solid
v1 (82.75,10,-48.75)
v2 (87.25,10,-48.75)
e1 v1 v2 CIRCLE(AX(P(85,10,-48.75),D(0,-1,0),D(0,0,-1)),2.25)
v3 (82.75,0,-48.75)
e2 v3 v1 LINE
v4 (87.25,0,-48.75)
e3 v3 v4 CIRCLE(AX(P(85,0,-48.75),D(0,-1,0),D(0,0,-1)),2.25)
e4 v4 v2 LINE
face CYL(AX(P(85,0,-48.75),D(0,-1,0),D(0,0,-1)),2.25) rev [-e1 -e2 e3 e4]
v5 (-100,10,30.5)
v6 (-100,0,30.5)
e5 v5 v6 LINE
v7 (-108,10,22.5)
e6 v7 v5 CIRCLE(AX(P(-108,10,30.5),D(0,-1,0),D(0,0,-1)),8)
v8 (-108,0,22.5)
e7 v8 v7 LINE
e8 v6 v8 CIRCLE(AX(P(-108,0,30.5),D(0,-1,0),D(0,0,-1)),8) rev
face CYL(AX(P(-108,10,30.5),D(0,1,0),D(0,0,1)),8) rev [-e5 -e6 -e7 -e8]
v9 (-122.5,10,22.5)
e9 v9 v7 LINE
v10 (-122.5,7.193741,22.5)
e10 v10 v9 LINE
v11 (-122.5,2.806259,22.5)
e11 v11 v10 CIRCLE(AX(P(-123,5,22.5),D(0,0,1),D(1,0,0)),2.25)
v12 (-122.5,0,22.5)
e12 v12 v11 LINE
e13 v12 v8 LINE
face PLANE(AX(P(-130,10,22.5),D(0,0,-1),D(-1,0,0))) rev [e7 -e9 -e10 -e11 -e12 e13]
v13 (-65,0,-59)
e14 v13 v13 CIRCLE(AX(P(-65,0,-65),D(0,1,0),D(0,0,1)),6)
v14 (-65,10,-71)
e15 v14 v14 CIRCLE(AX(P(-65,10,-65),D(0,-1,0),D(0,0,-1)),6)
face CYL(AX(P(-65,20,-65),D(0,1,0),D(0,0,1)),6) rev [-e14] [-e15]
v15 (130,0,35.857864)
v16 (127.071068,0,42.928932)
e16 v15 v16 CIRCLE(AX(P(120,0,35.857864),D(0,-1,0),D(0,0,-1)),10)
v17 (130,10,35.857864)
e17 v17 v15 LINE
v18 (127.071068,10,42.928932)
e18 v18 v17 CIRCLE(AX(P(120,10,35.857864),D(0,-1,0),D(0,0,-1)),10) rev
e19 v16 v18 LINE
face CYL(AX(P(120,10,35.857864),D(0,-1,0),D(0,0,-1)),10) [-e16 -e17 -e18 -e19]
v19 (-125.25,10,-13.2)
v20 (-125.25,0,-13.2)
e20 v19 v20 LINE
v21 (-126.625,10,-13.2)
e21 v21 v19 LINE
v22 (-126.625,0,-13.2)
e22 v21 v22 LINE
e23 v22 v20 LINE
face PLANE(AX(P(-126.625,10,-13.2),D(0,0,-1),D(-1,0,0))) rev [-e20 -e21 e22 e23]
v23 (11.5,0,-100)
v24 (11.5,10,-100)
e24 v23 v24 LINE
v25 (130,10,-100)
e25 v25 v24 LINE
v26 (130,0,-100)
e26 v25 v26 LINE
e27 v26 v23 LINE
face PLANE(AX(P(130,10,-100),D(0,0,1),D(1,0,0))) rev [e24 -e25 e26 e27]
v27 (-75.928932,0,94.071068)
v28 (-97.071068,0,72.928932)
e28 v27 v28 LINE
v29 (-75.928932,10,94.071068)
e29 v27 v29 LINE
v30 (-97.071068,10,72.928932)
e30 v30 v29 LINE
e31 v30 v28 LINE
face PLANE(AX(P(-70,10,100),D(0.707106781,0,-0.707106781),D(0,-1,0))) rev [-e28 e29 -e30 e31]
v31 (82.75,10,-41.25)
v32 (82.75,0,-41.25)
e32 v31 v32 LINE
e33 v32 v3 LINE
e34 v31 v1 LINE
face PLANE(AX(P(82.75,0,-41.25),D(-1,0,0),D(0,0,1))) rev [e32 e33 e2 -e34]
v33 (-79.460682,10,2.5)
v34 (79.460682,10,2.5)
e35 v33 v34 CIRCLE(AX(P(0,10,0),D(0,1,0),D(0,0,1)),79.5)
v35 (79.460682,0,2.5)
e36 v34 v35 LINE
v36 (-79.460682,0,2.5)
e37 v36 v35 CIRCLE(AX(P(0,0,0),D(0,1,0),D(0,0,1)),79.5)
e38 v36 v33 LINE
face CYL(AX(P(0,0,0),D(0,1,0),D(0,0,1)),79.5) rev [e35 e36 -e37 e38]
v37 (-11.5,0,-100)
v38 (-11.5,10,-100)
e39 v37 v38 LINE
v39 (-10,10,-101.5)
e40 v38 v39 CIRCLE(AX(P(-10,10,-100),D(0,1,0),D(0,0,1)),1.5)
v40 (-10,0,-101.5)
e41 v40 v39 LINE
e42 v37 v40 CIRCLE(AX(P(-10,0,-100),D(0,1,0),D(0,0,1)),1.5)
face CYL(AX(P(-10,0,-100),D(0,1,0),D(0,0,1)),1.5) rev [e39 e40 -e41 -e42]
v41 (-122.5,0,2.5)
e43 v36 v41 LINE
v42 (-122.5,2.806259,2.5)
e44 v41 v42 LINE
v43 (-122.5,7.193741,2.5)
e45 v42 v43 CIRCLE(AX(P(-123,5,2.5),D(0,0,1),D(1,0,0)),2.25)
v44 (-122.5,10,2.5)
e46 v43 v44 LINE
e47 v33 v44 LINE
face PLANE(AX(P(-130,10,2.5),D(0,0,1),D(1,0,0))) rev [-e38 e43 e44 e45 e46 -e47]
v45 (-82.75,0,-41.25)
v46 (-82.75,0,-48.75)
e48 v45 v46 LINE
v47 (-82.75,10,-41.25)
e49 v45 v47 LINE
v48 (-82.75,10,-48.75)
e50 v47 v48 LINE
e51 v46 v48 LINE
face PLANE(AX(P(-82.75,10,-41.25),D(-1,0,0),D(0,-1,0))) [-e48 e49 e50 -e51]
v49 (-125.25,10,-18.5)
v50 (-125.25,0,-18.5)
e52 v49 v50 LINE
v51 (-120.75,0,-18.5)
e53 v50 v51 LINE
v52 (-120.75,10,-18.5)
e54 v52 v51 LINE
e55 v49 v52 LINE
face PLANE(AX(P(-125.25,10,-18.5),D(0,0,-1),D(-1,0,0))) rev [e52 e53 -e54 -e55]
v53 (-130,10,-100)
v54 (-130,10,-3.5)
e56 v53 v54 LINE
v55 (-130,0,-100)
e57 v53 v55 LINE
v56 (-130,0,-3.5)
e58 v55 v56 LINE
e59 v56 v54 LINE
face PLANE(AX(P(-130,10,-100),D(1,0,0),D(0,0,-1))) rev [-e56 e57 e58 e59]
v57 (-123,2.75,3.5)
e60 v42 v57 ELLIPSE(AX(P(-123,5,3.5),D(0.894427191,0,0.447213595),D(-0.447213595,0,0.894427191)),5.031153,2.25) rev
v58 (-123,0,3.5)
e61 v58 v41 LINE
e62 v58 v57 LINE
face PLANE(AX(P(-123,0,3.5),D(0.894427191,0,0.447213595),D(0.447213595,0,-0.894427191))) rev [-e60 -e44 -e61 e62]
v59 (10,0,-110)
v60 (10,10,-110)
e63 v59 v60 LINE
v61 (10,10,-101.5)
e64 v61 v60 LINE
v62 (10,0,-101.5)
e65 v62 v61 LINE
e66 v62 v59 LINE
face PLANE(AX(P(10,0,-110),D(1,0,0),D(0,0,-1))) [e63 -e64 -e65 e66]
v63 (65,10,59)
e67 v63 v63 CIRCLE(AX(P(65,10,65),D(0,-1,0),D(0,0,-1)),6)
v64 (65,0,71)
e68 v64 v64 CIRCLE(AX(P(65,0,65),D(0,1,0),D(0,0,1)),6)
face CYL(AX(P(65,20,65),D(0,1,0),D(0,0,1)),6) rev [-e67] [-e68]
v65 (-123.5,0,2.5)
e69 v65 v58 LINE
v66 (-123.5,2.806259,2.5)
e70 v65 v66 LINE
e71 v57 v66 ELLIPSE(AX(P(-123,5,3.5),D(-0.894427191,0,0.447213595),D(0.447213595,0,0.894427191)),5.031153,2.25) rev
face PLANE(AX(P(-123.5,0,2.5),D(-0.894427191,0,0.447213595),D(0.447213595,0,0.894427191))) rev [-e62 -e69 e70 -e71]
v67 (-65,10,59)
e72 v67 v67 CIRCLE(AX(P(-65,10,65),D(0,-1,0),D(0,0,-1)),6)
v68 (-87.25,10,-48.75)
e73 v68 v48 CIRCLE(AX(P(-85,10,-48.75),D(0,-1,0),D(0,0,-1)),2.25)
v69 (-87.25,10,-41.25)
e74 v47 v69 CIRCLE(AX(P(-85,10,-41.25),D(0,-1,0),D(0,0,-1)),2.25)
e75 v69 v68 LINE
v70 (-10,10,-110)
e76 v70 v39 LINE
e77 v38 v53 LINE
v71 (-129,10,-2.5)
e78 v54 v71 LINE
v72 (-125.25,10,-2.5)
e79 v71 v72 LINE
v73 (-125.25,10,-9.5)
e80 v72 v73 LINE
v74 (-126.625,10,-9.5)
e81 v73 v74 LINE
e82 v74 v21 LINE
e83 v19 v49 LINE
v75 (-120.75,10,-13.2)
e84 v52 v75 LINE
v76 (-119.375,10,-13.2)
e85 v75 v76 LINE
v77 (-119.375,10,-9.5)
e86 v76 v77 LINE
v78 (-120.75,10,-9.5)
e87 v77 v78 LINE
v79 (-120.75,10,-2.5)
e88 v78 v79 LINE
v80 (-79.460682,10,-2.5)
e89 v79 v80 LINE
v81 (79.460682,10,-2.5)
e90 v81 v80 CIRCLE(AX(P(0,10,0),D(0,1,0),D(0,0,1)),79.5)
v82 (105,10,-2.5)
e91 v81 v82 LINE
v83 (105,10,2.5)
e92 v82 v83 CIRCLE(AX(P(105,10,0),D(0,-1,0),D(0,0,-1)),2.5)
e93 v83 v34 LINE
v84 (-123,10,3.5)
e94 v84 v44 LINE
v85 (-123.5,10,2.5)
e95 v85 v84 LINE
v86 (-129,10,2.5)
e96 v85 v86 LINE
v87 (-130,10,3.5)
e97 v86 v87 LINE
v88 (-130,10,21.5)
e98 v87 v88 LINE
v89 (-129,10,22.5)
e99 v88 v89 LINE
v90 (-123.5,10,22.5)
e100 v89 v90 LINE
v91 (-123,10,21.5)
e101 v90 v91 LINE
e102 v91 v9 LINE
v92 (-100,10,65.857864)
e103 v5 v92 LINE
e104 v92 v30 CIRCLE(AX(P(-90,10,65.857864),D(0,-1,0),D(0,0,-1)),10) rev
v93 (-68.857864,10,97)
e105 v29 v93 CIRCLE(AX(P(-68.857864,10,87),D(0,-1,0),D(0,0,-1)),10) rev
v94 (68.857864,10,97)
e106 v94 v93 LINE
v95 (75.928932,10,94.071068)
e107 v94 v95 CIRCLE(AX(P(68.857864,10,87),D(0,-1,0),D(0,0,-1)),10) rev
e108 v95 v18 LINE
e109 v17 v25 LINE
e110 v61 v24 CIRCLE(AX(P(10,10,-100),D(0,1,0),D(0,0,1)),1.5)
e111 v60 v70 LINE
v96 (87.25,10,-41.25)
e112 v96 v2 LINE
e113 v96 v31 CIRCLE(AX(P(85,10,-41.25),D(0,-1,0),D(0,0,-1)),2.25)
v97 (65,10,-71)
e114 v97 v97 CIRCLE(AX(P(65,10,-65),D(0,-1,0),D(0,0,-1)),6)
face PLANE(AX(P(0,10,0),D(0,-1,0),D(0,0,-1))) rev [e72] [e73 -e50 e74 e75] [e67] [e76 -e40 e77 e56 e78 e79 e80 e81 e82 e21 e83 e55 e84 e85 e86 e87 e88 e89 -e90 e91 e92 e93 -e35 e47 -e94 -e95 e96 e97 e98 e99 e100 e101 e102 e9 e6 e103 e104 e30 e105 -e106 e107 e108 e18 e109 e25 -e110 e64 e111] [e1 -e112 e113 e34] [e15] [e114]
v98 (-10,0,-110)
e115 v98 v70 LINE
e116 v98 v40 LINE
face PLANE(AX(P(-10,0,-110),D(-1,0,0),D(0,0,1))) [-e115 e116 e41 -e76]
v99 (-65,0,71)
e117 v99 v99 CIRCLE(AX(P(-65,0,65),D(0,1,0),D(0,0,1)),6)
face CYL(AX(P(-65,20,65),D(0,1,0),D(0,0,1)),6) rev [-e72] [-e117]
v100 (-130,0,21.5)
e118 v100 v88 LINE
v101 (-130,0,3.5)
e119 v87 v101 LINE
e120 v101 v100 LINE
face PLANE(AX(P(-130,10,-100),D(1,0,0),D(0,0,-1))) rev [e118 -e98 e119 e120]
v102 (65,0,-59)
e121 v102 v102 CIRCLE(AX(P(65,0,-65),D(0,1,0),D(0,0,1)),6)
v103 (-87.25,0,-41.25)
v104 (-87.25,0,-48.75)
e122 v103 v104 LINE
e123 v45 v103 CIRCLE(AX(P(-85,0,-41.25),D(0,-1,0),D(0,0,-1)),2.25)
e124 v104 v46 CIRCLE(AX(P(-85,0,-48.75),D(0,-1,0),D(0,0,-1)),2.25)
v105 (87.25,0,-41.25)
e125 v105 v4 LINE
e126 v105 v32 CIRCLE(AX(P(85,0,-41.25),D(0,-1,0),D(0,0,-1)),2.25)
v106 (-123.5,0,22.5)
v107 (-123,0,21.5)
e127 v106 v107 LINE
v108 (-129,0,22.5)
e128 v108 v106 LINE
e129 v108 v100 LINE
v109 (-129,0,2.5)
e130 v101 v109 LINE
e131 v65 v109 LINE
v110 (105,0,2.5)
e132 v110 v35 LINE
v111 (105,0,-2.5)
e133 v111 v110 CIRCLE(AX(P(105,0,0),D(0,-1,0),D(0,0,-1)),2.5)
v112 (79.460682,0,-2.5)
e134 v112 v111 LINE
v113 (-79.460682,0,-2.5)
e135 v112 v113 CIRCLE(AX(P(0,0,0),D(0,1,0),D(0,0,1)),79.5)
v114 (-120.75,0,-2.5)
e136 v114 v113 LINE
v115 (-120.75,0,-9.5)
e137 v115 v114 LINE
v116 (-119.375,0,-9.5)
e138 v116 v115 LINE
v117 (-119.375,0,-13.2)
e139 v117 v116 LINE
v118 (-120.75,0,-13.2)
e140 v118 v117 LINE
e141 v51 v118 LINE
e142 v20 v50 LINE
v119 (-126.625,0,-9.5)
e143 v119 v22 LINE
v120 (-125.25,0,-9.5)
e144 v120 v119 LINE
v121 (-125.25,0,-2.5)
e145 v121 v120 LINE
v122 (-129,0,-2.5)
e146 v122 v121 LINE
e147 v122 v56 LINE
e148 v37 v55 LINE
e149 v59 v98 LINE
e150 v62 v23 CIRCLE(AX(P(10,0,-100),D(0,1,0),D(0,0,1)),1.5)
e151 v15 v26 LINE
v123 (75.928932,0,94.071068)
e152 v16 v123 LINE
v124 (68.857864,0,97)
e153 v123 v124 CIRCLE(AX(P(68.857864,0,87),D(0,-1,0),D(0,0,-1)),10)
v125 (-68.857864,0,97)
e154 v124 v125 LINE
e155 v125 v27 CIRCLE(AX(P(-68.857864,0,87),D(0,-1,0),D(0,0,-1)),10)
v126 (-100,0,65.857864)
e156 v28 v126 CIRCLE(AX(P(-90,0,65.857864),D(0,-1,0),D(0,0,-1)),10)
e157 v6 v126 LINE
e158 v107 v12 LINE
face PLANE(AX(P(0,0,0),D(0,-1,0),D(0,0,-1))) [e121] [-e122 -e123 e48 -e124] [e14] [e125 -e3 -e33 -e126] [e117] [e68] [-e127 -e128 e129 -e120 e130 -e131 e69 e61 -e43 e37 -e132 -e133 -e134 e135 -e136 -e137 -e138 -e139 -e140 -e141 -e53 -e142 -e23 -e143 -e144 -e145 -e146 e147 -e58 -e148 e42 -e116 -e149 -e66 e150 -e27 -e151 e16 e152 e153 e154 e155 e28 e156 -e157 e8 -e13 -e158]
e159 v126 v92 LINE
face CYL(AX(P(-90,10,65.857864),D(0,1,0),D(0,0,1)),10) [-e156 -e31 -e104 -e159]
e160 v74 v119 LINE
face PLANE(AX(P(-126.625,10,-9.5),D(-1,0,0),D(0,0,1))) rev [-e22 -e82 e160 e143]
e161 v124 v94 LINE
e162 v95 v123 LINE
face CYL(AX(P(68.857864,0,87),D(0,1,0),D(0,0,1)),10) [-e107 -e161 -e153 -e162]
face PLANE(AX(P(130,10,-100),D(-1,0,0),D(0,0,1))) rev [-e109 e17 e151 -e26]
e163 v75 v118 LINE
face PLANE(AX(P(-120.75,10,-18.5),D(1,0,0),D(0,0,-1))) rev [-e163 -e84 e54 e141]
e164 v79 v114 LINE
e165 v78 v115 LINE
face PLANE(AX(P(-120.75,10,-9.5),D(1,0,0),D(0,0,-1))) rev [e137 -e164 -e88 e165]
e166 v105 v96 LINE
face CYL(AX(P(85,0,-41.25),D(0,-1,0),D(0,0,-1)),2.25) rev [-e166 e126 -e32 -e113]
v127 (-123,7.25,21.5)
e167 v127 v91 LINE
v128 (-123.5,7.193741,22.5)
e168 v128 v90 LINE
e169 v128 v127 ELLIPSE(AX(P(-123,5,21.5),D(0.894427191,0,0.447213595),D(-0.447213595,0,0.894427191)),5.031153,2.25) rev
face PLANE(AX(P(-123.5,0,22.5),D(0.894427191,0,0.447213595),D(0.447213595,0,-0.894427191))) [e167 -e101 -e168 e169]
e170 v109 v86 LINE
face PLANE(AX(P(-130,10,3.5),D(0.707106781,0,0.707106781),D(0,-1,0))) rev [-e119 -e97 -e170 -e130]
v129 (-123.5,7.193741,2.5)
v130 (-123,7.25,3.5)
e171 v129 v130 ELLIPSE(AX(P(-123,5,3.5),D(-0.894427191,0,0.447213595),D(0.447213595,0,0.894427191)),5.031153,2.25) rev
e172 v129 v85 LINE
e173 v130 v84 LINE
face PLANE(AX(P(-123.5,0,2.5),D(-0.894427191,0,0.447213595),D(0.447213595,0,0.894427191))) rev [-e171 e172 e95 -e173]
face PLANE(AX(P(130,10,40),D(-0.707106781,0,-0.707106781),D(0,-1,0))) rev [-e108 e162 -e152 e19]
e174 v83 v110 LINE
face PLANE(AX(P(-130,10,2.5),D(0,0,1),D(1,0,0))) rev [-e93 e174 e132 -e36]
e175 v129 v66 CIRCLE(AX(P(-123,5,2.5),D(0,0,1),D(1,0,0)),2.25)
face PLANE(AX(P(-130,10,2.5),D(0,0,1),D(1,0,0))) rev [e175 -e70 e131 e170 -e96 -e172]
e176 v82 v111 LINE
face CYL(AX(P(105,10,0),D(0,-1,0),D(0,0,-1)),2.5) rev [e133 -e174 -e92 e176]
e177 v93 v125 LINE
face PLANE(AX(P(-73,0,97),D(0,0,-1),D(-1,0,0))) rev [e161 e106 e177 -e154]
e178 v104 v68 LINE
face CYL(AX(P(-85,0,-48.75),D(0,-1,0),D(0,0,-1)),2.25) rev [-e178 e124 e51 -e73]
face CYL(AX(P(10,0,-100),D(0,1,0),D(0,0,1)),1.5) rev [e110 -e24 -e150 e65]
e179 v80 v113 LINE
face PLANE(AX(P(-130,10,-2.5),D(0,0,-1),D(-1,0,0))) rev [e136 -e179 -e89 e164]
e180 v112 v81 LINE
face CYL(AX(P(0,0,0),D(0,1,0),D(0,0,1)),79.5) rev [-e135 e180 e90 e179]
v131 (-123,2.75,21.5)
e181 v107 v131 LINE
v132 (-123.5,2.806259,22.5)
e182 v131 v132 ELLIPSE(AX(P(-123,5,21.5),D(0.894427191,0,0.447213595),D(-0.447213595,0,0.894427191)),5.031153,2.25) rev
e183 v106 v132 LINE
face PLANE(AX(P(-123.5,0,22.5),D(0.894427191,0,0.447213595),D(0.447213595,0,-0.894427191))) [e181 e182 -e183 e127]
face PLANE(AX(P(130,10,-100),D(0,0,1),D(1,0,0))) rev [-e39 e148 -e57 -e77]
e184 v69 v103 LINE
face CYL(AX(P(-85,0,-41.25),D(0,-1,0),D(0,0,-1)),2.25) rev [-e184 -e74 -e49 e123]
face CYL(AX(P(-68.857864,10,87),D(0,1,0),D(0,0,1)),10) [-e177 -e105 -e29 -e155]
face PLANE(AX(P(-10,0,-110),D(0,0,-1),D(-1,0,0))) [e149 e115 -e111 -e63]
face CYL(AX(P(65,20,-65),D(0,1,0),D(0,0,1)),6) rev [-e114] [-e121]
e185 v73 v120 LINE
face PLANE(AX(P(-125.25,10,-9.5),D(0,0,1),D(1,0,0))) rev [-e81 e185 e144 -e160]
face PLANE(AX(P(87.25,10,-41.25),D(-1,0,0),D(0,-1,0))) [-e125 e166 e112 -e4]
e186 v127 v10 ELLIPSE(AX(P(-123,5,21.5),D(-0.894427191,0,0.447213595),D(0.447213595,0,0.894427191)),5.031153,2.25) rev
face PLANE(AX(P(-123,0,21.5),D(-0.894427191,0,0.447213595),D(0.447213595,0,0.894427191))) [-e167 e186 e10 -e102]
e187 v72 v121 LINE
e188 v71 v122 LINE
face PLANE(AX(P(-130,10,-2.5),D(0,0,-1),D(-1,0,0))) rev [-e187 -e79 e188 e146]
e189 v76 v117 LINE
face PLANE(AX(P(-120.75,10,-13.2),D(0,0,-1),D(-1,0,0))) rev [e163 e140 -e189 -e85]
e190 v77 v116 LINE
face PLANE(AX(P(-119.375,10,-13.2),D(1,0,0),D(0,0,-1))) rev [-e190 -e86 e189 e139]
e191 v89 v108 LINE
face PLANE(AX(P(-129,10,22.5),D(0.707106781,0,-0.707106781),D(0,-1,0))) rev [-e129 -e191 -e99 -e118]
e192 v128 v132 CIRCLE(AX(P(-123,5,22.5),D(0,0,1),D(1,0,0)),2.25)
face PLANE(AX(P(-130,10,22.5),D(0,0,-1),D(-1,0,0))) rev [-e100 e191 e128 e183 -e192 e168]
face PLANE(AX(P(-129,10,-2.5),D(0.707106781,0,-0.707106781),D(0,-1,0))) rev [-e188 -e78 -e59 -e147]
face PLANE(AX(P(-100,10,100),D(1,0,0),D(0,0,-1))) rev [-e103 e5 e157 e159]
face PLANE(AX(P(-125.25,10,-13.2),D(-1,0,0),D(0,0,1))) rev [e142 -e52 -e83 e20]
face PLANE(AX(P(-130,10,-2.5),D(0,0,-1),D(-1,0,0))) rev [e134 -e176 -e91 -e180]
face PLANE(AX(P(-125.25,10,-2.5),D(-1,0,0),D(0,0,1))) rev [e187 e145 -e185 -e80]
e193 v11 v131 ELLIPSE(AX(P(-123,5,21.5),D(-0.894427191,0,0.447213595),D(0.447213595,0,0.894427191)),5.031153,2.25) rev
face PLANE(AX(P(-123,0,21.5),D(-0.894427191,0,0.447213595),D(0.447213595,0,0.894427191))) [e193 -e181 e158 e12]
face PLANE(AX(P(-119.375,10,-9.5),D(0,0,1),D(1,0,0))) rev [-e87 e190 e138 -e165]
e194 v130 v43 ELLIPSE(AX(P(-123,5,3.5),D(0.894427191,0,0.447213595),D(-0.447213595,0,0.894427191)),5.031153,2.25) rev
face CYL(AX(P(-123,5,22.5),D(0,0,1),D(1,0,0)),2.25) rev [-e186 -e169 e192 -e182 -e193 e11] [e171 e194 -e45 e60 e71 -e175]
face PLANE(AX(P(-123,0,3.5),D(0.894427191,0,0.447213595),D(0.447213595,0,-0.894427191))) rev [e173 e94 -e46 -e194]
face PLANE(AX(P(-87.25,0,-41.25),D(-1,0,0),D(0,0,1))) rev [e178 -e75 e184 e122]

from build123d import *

# Parameters (mm, degrees)
SKETCH1_W                  = 260
SKETCH1_H                  = 200
EXTRUDE1_DEPTH             = 10
SKETCH2_R                  = 79.5
EXTRUDE2_DEPTH             = 10
M4_CLEARANCE_HOLE2_DEPTH   = 10
EXTRUDE3_DEPTH             = 10
SKETCH6_W                  = 30
SKETCH6_H                  = 77.5
EXTRUDE4_DEPTH             = 10
FILLET1_R                  = 8
M4_CLEARANCE_HOLE3_D       = 4.5
M4_CLEARANCE_HOLE3_DEPTH   = 20
EXTRUDE5_DEPTH             = 10
F_12_0_12_DIAMETER_HOLE1_D = 12
CHAMFER1_SIZE              = 30
CHAMFER2_SIZE              = 1
CHAMFER3_SIZE              = 60
SKETCH16_W                 = 146
SKETCH16_H                 = 3
EXTRUDE6_DEPTH             = 10
FILLET4_R                  = 10
EXTRUDE7_DEPTH             = 10
SKETCH18_W                 = 20
SKETCH18_H                 = 10
EXTRUDE8_DEPTH             = 10
EXTRUDE9_DEPTH             = 10


# Read off the part's stored shape, not the designer's step: M4 Clearance Hole2
with BuildPart() as part:
    # Sketch1 → Extrude1 (new body)
    with BuildSketch(Plane(origin=(0, 0, 0), x_dir=(1, 0, 0), z_dir=(0, 1, 0))):
        Rectangle(SKETCH1_W, SKETCH1_H)
    extrude(amount=EXTRUDE1_DEPTH)

    # Sketch2 → Extrude2 (cut)
    with BuildSketch(Plane(origin=(0, 10, 0), x_dir=(1, 0, 0), z_dir=(0, 1, 0))):
        with Locations(Location((0, 0, 0), (0, 0, 270))):
            Circle(SKETCH2_R)
    extrude(amount=-EXTRUDE2_DEPTH, mode=Mode.SUBTRACT)

    # M4 Clearance Hole2 outline → M4 Clearance Hole2 (cut)
    with BuildSketch(Plane(origin=(0, 0, 0), x_dir=(1, 0, 0), z_dir=(0, 1, 0))):
        with BuildLine():
            ThreePointArc((-82.75, 48.75), (-85, 51), (-87.25, 48.75))
            Line((-87.25, 48.75), (-87.25, 41.25))
            ThreePointArc((-87.25, 41.25), (-85, 39), (-82.75, 41.25))
            Line((-82.75, 41.25), (-82.75, 48.75))
        make_face()
        with BuildLine():
            ThreePointArc((87.25, 48.75), (85, 51), (82.75, 48.75))
            Line((82.75, 48.75), (82.75, 41.25))
            ThreePointArc((82.75, 41.25), (85, 39), (87.25, 41.25))
            Line((87.25, 41.25), (87.25, 48.75))
        make_face()
    extrude(amount=M4_CLEARANCE_HOLE2_DEPTH, mode=Mode.SUBTRACT)

    # Sketch5 → Extrude3 (cut)
    with BuildSketch(Plane.XZ):
        with BuildLine():
            Line((-130, 2.5), (105, 2.5))
            ThreePointArc((105, 2.5), (107.5, 0), (105, -2.5))
            Line((105, -2.5), (-130, -2.5))
            Line((-130, -2.5), (-130, 2.5))
        make_face()
    extrude(amount=-EXTRUDE3_DEPTH, mode=Mode.SUBTRACT)

    # Sketch6 → Extrude4 (cut)
    with BuildSketch(Plane.XZ):
        with Locations((-115, 61.25)):
            Rectangle(SKETCH6_W, SKETCH6_H)
    extrude(amount=-EXTRUDE4_DEPTH, mode=Mode.SUBTRACT)

    # Fillet1
    fillet1_edges = [part.edges().sort_by_distance(p)[0] for p in [
        (-100, 5, 22.5),
    ]]
    fillet(fillet1_edges, radius=FILLET1_R)

    # M4 Clearance Hole3
    with Locations(Plane.XY.offset(22.5)):
        with Locations((-123, 5)):
            Hole(M4_CLEARANCE_HOLE3_D / 2, depth=M4_CLEARANCE_HOLE3_DEPTH)

    # Sketch11 → Extrude5 (cut)
    with BuildSketch(Plane.XZ):
        Polygon((-125.25, -2.5), (-125.25, -9.5), (-126.625, -9.5), (-126.625, -13.2), (-125.25, -13.2), (-125.25, -18.5), (-120.75, -18.5), (-120.75, -13.2), (-119.375, -13.2), (-119.375, -9.5), (-120.75, -9.5), (-120.75, -2.5), align=None)
    extrude(amount=-EXTRUDE5_DEPTH, mode=Mode.SUBTRACT)

    # Ø12.0 (12) Diameter Hole1 (through all)
    with Locations(Plane(origin=(-130, 20, 100), x_dir=(1, 0, 0), z_dir=(0, 1, 0))):
        with Locations((65, 165), (195, 165), (195, 35), (65, 35)):
            Hole(F_12_0_12_DIAMETER_HOLE1_D / 2)

    # Chamfer1
    chamfer1_edges = [part.edges().sort_by_distance(p)[0] for p in [
        (-100, 5, 100),
    ]]
    chamfer(chamfer1_edges, length=CHAMFER1_SIZE)

    # Chamfer2
    chamfer2_edges = [part.edges().sort_by_distance(p)[0] for p in [
        (-130, 5, 2.5),
        (-130, 5, -2.5),
        (-130, 5, 22.5),
    ]]
    chamfer(chamfer2_edges, length=CHAMFER2_SIZE)

    # Chamfer3
    chamfer3_edges = [part.edges().sort_by_distance(p)[0] for p in [
        (130, 5, 100),
    ]]
    chamfer(chamfer3_edges, length=CHAMFER3_SIZE)

    # Sketch16 → Extrude6 (cut)
    with BuildSketch(Plane(origin=(0, 10, 0), x_dir=(1, 0, 0), z_dir=(0, 1, 0))):
        with Locations((0, -98.5)):
            Rectangle(SKETCH16_W, SKETCH16_H)
    extrude(amount=-EXTRUDE6_DEPTH, mode=Mode.SUBTRACT)

    # Fillet4
    fillet4_edges = [part.edges().sort_by_distance(p)[0] for p in [
        (-100, 5, 70),
        (130, 5, 40),
        (-73, 5, 97),
        (73, 5, 97),
    ]]
    fillet(fillet4_edges, radius=FILLET4_R)

    # Sketch17 → Extrude7 (cut)
    with BuildSketch(Plane(origin=(0, 10, 0), x_dir=(1, 0, 0), z_dir=(0, 1, 0))):
        Polygon((-122.5, -2.5), (-123.5, -2.5), (-123, -3.5), align=None)
    extrude7 = extrude(amount=-EXTRUDE7_DEPTH, mode=Mode.SUBTRACT)

    # Mirror1: Extrude7 across plane
    add(extrude7.mirror(Plane(origin=(0, 0, 12.5), x_dir=(1, 0, 0), z_dir=(0, 0, -1))), mode=Mode.SUBTRACT)

    # Sketch18 → Extrude8 (add)
    with BuildSketch(Plane(origin=(0, 10, 0), x_dir=(1, 0, 0), z_dir=(0, 1, 0))):
        with Locations((0, 105)):
            Rectangle(SKETCH18_W, SKETCH18_H)
    extrude(amount=-EXTRUDE8_DEPTH)

    # Sketch19 → Extrude9 (cut)
    with BuildSketch(Plane(origin=(0, 10, 0), x_dir=(1, 0, 0), z_dir=(0, 1, 0))):
        with BuildLine():
            Line((-11.5, 100), (-10, 100))
            Line((-10, 100), (-10, 101.5))
            ThreePointArc((-10, 101.5), (-8.939339828, 98.939339828), (-11.5, 100))
        make_face()
        with BuildLine():
            Line((10, 101.5), (10, 100))
            Line((10, 100), (11.5, 100))
            ThreePointArc((11.5, 100), (8.939339828, 98.939339828), (10, 101.5))
        make_face()
    extrude(amount=-EXTRUDE9_DEPTH, mode=Mode.SUBTRACT)


solid = part.part
